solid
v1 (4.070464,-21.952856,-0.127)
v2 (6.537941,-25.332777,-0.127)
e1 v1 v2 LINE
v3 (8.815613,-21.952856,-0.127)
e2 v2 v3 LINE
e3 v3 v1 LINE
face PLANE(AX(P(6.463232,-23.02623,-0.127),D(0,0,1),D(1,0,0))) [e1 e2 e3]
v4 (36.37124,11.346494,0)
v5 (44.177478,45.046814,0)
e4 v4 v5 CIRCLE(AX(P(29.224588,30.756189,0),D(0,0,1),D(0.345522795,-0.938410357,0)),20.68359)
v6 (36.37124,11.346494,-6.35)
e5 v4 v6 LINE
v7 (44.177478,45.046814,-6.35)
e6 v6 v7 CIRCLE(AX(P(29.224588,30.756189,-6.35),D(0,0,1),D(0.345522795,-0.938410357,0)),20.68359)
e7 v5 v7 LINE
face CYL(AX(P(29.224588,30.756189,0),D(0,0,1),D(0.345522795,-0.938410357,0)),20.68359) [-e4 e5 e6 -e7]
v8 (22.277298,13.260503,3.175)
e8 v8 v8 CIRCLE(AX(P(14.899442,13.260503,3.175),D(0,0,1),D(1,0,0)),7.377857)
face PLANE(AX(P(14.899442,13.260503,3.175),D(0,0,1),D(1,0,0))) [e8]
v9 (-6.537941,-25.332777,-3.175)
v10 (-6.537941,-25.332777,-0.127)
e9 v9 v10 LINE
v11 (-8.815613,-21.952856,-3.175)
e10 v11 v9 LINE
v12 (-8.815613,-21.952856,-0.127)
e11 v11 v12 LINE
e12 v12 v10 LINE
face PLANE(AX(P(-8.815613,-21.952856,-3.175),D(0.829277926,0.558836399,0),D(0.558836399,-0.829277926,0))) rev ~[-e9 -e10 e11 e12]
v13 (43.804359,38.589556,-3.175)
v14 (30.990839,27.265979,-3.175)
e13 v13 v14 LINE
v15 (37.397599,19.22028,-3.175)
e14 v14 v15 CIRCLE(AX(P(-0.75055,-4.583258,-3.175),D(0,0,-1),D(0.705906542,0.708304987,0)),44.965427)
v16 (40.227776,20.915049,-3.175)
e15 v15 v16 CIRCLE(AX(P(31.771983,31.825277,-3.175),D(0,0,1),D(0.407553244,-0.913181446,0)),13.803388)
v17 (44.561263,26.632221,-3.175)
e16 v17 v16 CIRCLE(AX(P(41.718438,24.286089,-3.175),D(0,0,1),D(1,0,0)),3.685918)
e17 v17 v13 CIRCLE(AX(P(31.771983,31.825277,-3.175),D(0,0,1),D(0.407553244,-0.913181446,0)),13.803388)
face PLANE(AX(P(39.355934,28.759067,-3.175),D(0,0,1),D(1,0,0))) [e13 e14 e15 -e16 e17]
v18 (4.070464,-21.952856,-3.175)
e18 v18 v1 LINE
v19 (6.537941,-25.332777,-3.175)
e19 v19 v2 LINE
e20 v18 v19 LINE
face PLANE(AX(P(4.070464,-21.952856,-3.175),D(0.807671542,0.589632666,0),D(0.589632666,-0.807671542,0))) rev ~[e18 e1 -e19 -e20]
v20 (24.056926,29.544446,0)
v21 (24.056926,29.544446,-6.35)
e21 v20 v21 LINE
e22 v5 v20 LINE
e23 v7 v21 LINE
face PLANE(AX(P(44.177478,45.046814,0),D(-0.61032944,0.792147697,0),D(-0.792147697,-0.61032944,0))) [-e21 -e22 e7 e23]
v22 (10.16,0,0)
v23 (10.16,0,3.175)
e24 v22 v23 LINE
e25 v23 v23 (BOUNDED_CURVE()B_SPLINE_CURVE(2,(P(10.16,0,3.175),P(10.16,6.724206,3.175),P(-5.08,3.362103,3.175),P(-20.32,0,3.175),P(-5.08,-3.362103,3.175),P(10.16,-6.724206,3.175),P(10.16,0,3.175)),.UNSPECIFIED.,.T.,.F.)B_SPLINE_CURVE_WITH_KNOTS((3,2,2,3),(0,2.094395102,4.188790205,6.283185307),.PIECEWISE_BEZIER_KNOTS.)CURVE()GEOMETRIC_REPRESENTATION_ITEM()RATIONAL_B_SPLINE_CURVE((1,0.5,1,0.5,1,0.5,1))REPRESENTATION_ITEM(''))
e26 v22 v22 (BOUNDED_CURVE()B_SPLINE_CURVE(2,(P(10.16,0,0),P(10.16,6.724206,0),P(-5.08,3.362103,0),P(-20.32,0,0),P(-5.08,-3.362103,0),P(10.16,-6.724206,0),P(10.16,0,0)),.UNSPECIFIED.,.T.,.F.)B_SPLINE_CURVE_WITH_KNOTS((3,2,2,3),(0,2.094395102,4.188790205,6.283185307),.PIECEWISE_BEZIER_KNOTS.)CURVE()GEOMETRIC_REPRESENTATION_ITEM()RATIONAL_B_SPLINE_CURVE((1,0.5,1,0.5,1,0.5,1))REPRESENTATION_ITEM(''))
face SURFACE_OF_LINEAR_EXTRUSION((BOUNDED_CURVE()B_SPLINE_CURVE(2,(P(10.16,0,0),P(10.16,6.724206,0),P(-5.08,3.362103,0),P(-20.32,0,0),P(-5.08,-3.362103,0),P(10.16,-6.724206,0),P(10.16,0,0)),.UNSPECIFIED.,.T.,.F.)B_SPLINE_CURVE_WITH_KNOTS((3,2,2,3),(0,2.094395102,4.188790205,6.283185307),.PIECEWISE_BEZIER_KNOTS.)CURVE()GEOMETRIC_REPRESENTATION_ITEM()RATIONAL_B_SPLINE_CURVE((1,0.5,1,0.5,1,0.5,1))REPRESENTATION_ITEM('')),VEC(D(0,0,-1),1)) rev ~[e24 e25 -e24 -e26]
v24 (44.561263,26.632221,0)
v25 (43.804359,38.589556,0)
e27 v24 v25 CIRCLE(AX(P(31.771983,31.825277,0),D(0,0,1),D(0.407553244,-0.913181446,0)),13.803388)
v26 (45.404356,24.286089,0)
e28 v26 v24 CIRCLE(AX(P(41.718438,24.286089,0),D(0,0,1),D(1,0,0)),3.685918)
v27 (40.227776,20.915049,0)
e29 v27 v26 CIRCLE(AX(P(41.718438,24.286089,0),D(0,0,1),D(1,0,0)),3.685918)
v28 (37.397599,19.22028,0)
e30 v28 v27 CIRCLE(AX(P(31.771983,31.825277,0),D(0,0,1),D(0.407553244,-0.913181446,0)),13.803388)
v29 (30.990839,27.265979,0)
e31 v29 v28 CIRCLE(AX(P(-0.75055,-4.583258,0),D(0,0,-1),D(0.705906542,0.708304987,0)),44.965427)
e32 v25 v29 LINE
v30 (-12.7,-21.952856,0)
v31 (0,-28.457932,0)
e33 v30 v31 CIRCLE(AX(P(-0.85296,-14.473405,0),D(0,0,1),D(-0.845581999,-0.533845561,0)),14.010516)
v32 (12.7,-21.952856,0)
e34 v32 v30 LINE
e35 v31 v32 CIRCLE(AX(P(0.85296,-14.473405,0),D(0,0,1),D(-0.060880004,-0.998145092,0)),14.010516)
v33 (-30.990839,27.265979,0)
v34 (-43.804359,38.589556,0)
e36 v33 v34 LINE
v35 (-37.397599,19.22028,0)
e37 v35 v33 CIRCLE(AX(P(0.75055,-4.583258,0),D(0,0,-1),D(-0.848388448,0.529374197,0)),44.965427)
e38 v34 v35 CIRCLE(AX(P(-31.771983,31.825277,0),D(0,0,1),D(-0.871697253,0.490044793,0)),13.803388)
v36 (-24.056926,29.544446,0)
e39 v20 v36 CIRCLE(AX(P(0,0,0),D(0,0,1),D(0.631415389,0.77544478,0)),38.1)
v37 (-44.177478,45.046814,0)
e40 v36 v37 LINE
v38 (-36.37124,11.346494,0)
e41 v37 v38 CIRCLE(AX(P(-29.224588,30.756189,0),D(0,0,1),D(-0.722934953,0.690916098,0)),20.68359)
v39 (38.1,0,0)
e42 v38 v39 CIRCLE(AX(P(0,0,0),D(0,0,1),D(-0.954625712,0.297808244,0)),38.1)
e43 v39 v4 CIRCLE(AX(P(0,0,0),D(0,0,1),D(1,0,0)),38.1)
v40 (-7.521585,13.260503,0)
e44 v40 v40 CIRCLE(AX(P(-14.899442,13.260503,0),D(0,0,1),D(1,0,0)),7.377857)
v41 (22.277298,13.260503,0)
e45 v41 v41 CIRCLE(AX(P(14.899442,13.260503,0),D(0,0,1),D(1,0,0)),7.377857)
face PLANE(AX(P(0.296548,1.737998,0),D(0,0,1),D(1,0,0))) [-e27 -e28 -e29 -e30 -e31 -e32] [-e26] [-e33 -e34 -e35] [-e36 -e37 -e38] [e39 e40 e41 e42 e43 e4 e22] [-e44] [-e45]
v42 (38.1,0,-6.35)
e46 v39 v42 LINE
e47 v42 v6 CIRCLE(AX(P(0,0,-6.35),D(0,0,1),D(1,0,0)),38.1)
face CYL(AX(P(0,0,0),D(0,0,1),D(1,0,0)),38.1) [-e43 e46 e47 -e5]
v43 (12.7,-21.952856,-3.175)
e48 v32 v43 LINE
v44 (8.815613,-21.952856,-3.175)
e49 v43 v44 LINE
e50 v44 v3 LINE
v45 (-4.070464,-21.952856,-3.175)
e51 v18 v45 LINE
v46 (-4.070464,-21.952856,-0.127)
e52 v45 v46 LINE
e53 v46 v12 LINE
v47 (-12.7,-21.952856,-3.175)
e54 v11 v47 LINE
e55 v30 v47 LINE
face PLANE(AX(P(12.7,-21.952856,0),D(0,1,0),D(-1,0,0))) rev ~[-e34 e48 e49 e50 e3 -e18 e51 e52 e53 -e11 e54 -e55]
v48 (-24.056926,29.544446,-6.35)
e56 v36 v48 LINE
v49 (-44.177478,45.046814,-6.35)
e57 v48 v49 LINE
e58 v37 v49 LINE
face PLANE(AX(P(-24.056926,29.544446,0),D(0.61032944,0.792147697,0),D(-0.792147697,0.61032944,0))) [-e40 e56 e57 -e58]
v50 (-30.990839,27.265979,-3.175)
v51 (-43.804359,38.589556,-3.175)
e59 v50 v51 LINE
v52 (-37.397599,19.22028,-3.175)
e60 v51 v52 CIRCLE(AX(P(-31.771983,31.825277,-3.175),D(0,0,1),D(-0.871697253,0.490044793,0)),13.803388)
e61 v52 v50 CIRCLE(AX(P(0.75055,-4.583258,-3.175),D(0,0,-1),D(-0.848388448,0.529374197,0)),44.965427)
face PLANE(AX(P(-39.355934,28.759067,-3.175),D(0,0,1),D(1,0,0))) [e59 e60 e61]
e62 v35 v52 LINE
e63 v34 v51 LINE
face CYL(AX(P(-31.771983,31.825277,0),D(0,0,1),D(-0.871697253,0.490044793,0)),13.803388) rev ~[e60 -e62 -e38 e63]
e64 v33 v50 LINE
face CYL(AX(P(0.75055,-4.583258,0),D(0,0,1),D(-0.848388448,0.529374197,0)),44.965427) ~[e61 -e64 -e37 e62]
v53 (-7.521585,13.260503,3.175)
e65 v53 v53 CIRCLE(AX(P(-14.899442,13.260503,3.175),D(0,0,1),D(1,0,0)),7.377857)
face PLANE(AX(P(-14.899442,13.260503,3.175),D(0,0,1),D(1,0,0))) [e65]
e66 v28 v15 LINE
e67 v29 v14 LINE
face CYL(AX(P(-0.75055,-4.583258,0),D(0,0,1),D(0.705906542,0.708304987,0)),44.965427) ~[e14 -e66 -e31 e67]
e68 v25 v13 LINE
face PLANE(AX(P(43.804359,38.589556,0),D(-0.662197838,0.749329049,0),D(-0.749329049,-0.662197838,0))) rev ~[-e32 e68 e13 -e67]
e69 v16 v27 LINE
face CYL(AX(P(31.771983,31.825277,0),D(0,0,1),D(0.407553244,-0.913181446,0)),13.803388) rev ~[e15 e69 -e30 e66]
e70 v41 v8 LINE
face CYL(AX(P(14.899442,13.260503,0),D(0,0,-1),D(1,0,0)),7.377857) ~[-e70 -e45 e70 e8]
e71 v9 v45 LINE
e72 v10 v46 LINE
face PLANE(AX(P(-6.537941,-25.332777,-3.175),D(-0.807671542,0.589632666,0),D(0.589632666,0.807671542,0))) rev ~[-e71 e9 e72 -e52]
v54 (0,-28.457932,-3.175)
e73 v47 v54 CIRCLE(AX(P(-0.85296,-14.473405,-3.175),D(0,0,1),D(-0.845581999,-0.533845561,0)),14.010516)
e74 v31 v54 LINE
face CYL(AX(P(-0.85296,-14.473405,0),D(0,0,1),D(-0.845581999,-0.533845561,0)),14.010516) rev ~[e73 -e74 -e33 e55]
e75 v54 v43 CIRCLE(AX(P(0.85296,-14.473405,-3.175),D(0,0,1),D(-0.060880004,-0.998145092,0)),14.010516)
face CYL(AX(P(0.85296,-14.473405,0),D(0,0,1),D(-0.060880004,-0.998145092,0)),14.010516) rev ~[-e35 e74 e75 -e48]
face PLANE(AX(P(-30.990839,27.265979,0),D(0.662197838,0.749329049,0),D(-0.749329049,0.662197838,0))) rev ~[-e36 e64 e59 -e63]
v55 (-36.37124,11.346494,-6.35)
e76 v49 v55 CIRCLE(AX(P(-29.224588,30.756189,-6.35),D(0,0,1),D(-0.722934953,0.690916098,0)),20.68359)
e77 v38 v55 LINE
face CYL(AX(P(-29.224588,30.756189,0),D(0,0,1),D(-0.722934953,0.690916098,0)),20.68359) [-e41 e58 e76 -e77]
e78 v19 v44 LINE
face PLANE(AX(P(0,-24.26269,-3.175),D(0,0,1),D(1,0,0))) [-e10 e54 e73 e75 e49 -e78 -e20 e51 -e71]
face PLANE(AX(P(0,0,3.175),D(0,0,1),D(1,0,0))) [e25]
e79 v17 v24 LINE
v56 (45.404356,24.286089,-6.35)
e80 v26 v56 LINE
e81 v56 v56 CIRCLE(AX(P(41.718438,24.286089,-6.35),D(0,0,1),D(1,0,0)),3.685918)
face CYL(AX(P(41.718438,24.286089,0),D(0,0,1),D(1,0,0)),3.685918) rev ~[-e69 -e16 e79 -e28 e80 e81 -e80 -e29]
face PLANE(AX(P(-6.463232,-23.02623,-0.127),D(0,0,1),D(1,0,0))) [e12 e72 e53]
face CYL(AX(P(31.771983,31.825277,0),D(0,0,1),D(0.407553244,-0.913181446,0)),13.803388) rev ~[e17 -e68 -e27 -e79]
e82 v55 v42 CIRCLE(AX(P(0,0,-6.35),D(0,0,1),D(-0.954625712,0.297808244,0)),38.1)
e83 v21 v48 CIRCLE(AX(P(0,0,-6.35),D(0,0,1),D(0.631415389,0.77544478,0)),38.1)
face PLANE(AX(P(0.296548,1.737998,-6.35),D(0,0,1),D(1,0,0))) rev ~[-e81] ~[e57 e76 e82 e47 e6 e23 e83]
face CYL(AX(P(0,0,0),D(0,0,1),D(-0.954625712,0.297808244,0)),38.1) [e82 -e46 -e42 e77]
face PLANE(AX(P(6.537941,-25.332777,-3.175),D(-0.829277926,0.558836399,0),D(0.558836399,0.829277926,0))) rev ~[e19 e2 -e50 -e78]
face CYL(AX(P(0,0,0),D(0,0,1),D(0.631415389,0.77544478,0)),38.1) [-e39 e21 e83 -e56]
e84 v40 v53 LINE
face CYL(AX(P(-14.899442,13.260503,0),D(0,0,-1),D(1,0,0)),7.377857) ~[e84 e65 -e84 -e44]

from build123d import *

# Parameters (mm, degrees)
F1_DEPTH  = 6.35
F3_DEPTH  = 3.175
F6_DEPTH  = 3.175
F8_DEPTH  = 3.175
F10_DEPTH = 3.048
F4_R      = 7.3778565178
F11_DEPTH = 3.175
F12_R     = 3.6859176852
F13_DEPTH = 6.351


# Not quite as in the source:
# - a feature names something its author has since deleted; it is built from what else it names


with BuildPart() as f1:
    # F0 (on Top) → F1 (new body)
    with BuildSketch(Plane.XY):
        with BuildLine():
            ThreePointArc((-36.3712396262, 11.3464940865), (-5.738718073, -37.6653304098), (38.1, 0))
            ThreePointArc((38.1, 0), (37.6653304098, 5.738718073), (36.3712396262, 11.3464940865))
            ThreePointArc((36.3712396262, 11.3464940865), (31.5544319278, 21.3524665018), (24.0569263159, 29.5444461148))
            ThreePointArc((24.0569263159, 29.5444461148), (0, 38.1), (-24.0569263159, 29.5444461148))
            ThreePointArc((-24.0569263159, 29.5444461148), (-31.5544319278, 21.3524665018), (-36.3712396262, 11.3464940865))
        make_face()
        with BuildLine():
            ThreePointArc((24.0569263159, 29.5444461148), (31.5544319278, 21.3524665018), (36.3712396262, 11.3464940865))
            ThreePointArc((36.3712396262, 11.3464940865), (49.3746579826, 26.088688726), (44.1774778249, 45.0468139009))
            Line((44.1774778249, 45.0468139009), (24.0569263159, 29.5444461148))
        make_face()
        with BuildLine():
            ThreePointArc((-44.1774778249, 45.0468139009), (-49.3746579826, 26.088688726), (-36.3712396262, 11.3464940865))
            ThreePointArc((-36.3712396262, 11.3464940865), (-31.5544319278, 21.3524665018), (-24.0569263159, 29.5444461148))
            Line((-24.0569263159, 29.5444461148), (-44.1774778249, 45.0468139009))
        make_face()
    extrude(amount=-F1_DEPTH)

    # F2 (on Top) → F3 (join)
    with BuildSketch(Plane.XY):
        with BuildLine():
            add(Edge.make_bspline(
                [(10.16, 0), (10.16, 6.7242064297), (-5.08, 3.3621032148), (-20.32, 0), (-5.08, -3.3621032148), (10.16, -6.7242064297), (10.16, 0)],
                knots=[0, 0, 0, 2.0943951024, 2.0943951024, 4.1887902048, 4.1887902048, 6.2831853072, 6.2831853072, 6.2831853072], degree=2, weights=[1, 0.5, 1, 0.5, 1, 0.5, 1]))
        make_face()
    extrude(amount=F3_DEPTH)

    # F5 (on face) → F6 (cut)
    with BuildSketch(Plane.XY):
        with BuildLine():
            Line((-30.9908390045, 27.2659789771), (-43.804358691, 38.5895557702))
            ThreePointArc((-43.804358691, 38.5895557702), (-44.8770730118, 27.4905174143), (-37.3975988477, 19.2202795297))
            ThreePointArc((-37.3975988477, 19.2202795297), (-34.4250124692, 23.4269092732), (-30.9908390045, 27.2659789771))
        make_face()
        with BuildLine():
            ThreePointArc((37.3975988477, 19.2202795297), (44.8770730118, 27.4905174143), (43.804358691, 38.5895557702))
            Line((43.804358691, 38.5895557702), (30.9908390045, 27.2659789771))
            ThreePointArc((30.9908390045, 27.2659789771), (34.4250124692, 23.4269092732), (37.3975988477, 19.2202795297))
        make_face()
    extrude(amount=-F6_DEPTH, mode=Mode.SUBTRACT)

    # F7 (on face) → F8 (cut)
    with BuildSketch(Plane.XY):
        with BuildLine():
            Line((12.7, -21.9528563652), (0, -21.9528563652))
            Line((0, -21.9528563652), (-12.7, -21.9528563652))
            ThreePointArc((-12.7, -21.9528563652), (-7.2401700339, -26.9432924529), (0, -28.4579321742))
            ThreePointArc((0, -28.4579321742), (7.2401700339, -26.9432924529), (12.7, -21.9528563652))
        make_face()
    extrude(amount=-F8_DEPTH, mode=Mode.SUBTRACT)

    # F9 (on face) → F10 (join)
    with BuildSketch(Plane.XY.offset(-3.175)):
        Polygon((-4.0704635903, -21.9528563652), (-8.815612644, -21.9528563652), (-6.5379412845, -25.3327768296), align=None)
        Polygon((4.0704635903, -21.9528563652), (6.5379412845, -25.3327768296), (8.815612644, -21.9528563652), align=None)
    extrude(amount=F10_DEPTH)

    # F4 (on face) → F11 (join)
    with BuildSketch(Plane.XY):
        with Locations((-14.8994419724, 13.2605032995)):
            Circle(F4_R)
        with Locations((14.8994419724, 13.2605032995)):
            Circle(F4_R)
    extrude(amount=F11_DEPTH)

    # F12 (on face) → F13 (cut, through all)
    with BuildSketch(Plane.XY):
        with Locations((41.7184382677, 24.286089465)):
            Circle(F12_R)
    extrude(amount=-F13_DEPTH, mode=Mode.SUBTRACT)


solid = f1.part
